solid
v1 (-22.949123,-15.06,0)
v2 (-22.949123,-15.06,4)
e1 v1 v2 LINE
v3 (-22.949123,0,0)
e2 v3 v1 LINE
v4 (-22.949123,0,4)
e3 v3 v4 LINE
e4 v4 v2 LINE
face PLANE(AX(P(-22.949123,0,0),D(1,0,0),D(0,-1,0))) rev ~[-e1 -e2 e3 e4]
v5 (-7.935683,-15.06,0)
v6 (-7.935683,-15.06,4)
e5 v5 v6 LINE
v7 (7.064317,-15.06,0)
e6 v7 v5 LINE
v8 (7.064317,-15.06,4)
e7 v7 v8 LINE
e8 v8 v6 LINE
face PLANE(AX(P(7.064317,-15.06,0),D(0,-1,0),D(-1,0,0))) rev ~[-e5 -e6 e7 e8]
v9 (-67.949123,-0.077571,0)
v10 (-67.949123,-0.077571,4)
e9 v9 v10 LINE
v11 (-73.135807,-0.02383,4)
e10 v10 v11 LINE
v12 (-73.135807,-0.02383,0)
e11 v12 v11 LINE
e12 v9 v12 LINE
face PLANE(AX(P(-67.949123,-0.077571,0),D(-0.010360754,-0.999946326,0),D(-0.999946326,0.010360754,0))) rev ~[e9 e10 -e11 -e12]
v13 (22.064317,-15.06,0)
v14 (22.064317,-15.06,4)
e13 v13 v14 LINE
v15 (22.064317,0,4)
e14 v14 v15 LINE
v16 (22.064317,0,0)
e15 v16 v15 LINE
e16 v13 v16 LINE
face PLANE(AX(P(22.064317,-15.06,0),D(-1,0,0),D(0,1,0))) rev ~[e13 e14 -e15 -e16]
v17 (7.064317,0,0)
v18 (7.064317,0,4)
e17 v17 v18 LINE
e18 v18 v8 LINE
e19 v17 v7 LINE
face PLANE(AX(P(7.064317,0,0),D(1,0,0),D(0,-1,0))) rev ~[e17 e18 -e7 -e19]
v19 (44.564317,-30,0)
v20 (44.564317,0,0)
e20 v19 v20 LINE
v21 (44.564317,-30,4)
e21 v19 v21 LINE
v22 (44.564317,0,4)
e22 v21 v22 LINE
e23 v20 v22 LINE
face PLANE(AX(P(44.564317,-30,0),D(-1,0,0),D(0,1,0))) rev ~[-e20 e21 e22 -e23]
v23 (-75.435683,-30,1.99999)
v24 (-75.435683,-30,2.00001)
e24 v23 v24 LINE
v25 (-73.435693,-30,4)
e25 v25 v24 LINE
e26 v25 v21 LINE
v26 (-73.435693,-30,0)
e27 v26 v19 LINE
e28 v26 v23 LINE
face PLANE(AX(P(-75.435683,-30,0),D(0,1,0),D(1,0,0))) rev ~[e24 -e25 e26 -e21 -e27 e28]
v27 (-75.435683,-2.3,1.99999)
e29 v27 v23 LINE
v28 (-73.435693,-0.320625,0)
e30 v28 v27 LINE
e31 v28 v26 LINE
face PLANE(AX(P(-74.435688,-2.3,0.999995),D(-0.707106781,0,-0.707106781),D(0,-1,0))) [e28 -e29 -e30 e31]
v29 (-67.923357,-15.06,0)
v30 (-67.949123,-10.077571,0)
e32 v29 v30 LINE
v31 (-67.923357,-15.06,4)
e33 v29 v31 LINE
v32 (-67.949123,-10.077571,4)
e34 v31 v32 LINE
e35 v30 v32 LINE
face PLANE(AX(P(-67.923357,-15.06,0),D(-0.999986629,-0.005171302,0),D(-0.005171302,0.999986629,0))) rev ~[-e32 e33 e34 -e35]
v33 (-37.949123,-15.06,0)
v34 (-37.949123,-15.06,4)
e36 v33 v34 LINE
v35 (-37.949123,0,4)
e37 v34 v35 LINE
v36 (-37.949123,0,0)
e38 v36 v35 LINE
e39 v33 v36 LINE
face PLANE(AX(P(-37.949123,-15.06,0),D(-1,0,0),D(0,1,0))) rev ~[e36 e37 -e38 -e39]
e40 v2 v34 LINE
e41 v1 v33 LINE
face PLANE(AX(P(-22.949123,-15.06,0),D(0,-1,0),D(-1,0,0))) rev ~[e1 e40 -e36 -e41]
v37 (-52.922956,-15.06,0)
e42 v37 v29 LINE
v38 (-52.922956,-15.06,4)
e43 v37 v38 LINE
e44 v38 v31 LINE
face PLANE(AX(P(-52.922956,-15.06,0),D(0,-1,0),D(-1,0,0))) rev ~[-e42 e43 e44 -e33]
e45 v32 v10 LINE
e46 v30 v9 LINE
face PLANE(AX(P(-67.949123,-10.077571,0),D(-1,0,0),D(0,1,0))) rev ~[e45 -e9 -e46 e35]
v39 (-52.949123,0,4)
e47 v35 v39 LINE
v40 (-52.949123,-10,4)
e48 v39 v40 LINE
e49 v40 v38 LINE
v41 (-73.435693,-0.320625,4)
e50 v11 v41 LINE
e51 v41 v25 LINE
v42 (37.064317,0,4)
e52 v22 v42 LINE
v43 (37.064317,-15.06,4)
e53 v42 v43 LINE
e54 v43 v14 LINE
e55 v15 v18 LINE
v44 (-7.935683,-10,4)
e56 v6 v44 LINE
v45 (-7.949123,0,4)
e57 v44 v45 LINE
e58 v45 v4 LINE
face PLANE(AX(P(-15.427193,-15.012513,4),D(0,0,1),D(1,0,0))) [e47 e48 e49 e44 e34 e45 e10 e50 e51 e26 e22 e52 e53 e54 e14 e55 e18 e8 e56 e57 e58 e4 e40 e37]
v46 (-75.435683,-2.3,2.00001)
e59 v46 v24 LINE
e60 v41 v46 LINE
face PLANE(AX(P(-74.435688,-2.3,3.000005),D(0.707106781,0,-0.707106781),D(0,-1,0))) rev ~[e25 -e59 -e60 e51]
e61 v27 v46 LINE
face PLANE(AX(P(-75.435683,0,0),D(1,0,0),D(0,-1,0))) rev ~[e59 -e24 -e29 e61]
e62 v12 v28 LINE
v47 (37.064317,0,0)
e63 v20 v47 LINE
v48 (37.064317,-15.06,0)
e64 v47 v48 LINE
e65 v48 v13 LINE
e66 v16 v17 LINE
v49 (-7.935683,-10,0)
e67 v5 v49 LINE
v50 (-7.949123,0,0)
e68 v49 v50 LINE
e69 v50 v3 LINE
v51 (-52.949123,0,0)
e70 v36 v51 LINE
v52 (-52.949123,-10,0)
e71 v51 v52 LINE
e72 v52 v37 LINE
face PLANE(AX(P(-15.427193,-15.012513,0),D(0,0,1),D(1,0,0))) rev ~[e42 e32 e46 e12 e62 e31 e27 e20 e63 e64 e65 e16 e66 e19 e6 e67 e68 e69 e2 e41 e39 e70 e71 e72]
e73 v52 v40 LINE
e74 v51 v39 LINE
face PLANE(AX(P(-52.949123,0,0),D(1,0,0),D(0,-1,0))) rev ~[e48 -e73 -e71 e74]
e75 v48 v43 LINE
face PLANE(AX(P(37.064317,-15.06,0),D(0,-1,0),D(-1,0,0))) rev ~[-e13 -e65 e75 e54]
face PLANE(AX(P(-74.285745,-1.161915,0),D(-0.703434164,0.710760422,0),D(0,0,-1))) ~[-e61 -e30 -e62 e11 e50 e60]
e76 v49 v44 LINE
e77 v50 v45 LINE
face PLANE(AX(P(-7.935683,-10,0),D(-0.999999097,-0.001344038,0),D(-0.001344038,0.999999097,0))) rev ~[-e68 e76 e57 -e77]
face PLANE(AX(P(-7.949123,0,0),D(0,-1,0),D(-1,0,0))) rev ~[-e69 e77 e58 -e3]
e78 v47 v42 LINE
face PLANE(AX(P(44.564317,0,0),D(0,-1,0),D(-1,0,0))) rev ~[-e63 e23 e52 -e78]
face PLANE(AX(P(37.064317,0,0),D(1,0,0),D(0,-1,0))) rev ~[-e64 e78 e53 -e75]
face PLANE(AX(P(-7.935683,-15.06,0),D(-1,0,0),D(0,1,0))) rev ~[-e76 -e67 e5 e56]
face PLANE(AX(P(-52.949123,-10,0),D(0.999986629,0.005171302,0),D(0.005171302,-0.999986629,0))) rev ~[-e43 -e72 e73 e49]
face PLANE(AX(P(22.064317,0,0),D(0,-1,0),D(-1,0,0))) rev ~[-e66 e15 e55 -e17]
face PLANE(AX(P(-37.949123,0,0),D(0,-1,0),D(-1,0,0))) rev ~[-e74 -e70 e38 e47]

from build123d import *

# Parameters (mm, degrees)
F1_DEPTH = 4
F2_SIZE  = 2.3
F3_SIZE  = 1.99999


# Not quite as in the source:
# - a fillet or chamfer is up to 0.001 mm smaller than in the source, because OpenCascade refuses the exact size


with BuildPart() as f1:
    # F0 (on Top) → F1 (new body)
    with BuildSketch(Plane.XY):
        Polygon((-75.4356830697, -28.6679565907), (-75.4356830697, -30), (44.5643169303, -30), (44.5643169303, 0), (37.0643169303, 0), (37.0643169303, -10), (37.0643169303, -15.06), (22.0643169303, -15.06), (22.0643169303, -10), (22.0643169303, 0), (7.0643169303, 0), (7.0643169303, -10), (7.0643169303, -15.06), (-7.9356830697, -15.06), (-7.9356830697, -10), (-7.9491234598, 0), (-22.9491234598, 0), (-22.9491234598, -10), (-22.9491234598, -15.06), (-37.9491234598, -15.06), (-37.9491234598, -10), (-37.9491234598, 0), (-52.9491234598, 0), (-52.9491234598, -10), (-52.9229563225, -15.06), (-67.9233574687, -15.06), (-67.9491234598, -10.077570565), (-67.9491234598, -0.077570565), (-75.4356830697, 0), (-75.4356830697, -15.06), align=None)
    extrude(amount=F1_DEPTH)

    # F2
    f2_edges = [f1.edges().sort_by_distance(p)[0] for p in [
        (-75.435683, 0, 2),
    ]]
    chamfer(f2_edges, length=F2_SIZE)

    # F3 (size 2 in the source; OpenCascade refuses exactly that, so slightly less here)
    f3_edges = [f1.edges().sort_by_distance(p)[0] for p in [
        (-75.435683, -16.15, 0),
        (-75.435683, -16.15, 4),
    ]]
    chamfer(f3_edges, length=F3_SIZE)


solid = f1.part
